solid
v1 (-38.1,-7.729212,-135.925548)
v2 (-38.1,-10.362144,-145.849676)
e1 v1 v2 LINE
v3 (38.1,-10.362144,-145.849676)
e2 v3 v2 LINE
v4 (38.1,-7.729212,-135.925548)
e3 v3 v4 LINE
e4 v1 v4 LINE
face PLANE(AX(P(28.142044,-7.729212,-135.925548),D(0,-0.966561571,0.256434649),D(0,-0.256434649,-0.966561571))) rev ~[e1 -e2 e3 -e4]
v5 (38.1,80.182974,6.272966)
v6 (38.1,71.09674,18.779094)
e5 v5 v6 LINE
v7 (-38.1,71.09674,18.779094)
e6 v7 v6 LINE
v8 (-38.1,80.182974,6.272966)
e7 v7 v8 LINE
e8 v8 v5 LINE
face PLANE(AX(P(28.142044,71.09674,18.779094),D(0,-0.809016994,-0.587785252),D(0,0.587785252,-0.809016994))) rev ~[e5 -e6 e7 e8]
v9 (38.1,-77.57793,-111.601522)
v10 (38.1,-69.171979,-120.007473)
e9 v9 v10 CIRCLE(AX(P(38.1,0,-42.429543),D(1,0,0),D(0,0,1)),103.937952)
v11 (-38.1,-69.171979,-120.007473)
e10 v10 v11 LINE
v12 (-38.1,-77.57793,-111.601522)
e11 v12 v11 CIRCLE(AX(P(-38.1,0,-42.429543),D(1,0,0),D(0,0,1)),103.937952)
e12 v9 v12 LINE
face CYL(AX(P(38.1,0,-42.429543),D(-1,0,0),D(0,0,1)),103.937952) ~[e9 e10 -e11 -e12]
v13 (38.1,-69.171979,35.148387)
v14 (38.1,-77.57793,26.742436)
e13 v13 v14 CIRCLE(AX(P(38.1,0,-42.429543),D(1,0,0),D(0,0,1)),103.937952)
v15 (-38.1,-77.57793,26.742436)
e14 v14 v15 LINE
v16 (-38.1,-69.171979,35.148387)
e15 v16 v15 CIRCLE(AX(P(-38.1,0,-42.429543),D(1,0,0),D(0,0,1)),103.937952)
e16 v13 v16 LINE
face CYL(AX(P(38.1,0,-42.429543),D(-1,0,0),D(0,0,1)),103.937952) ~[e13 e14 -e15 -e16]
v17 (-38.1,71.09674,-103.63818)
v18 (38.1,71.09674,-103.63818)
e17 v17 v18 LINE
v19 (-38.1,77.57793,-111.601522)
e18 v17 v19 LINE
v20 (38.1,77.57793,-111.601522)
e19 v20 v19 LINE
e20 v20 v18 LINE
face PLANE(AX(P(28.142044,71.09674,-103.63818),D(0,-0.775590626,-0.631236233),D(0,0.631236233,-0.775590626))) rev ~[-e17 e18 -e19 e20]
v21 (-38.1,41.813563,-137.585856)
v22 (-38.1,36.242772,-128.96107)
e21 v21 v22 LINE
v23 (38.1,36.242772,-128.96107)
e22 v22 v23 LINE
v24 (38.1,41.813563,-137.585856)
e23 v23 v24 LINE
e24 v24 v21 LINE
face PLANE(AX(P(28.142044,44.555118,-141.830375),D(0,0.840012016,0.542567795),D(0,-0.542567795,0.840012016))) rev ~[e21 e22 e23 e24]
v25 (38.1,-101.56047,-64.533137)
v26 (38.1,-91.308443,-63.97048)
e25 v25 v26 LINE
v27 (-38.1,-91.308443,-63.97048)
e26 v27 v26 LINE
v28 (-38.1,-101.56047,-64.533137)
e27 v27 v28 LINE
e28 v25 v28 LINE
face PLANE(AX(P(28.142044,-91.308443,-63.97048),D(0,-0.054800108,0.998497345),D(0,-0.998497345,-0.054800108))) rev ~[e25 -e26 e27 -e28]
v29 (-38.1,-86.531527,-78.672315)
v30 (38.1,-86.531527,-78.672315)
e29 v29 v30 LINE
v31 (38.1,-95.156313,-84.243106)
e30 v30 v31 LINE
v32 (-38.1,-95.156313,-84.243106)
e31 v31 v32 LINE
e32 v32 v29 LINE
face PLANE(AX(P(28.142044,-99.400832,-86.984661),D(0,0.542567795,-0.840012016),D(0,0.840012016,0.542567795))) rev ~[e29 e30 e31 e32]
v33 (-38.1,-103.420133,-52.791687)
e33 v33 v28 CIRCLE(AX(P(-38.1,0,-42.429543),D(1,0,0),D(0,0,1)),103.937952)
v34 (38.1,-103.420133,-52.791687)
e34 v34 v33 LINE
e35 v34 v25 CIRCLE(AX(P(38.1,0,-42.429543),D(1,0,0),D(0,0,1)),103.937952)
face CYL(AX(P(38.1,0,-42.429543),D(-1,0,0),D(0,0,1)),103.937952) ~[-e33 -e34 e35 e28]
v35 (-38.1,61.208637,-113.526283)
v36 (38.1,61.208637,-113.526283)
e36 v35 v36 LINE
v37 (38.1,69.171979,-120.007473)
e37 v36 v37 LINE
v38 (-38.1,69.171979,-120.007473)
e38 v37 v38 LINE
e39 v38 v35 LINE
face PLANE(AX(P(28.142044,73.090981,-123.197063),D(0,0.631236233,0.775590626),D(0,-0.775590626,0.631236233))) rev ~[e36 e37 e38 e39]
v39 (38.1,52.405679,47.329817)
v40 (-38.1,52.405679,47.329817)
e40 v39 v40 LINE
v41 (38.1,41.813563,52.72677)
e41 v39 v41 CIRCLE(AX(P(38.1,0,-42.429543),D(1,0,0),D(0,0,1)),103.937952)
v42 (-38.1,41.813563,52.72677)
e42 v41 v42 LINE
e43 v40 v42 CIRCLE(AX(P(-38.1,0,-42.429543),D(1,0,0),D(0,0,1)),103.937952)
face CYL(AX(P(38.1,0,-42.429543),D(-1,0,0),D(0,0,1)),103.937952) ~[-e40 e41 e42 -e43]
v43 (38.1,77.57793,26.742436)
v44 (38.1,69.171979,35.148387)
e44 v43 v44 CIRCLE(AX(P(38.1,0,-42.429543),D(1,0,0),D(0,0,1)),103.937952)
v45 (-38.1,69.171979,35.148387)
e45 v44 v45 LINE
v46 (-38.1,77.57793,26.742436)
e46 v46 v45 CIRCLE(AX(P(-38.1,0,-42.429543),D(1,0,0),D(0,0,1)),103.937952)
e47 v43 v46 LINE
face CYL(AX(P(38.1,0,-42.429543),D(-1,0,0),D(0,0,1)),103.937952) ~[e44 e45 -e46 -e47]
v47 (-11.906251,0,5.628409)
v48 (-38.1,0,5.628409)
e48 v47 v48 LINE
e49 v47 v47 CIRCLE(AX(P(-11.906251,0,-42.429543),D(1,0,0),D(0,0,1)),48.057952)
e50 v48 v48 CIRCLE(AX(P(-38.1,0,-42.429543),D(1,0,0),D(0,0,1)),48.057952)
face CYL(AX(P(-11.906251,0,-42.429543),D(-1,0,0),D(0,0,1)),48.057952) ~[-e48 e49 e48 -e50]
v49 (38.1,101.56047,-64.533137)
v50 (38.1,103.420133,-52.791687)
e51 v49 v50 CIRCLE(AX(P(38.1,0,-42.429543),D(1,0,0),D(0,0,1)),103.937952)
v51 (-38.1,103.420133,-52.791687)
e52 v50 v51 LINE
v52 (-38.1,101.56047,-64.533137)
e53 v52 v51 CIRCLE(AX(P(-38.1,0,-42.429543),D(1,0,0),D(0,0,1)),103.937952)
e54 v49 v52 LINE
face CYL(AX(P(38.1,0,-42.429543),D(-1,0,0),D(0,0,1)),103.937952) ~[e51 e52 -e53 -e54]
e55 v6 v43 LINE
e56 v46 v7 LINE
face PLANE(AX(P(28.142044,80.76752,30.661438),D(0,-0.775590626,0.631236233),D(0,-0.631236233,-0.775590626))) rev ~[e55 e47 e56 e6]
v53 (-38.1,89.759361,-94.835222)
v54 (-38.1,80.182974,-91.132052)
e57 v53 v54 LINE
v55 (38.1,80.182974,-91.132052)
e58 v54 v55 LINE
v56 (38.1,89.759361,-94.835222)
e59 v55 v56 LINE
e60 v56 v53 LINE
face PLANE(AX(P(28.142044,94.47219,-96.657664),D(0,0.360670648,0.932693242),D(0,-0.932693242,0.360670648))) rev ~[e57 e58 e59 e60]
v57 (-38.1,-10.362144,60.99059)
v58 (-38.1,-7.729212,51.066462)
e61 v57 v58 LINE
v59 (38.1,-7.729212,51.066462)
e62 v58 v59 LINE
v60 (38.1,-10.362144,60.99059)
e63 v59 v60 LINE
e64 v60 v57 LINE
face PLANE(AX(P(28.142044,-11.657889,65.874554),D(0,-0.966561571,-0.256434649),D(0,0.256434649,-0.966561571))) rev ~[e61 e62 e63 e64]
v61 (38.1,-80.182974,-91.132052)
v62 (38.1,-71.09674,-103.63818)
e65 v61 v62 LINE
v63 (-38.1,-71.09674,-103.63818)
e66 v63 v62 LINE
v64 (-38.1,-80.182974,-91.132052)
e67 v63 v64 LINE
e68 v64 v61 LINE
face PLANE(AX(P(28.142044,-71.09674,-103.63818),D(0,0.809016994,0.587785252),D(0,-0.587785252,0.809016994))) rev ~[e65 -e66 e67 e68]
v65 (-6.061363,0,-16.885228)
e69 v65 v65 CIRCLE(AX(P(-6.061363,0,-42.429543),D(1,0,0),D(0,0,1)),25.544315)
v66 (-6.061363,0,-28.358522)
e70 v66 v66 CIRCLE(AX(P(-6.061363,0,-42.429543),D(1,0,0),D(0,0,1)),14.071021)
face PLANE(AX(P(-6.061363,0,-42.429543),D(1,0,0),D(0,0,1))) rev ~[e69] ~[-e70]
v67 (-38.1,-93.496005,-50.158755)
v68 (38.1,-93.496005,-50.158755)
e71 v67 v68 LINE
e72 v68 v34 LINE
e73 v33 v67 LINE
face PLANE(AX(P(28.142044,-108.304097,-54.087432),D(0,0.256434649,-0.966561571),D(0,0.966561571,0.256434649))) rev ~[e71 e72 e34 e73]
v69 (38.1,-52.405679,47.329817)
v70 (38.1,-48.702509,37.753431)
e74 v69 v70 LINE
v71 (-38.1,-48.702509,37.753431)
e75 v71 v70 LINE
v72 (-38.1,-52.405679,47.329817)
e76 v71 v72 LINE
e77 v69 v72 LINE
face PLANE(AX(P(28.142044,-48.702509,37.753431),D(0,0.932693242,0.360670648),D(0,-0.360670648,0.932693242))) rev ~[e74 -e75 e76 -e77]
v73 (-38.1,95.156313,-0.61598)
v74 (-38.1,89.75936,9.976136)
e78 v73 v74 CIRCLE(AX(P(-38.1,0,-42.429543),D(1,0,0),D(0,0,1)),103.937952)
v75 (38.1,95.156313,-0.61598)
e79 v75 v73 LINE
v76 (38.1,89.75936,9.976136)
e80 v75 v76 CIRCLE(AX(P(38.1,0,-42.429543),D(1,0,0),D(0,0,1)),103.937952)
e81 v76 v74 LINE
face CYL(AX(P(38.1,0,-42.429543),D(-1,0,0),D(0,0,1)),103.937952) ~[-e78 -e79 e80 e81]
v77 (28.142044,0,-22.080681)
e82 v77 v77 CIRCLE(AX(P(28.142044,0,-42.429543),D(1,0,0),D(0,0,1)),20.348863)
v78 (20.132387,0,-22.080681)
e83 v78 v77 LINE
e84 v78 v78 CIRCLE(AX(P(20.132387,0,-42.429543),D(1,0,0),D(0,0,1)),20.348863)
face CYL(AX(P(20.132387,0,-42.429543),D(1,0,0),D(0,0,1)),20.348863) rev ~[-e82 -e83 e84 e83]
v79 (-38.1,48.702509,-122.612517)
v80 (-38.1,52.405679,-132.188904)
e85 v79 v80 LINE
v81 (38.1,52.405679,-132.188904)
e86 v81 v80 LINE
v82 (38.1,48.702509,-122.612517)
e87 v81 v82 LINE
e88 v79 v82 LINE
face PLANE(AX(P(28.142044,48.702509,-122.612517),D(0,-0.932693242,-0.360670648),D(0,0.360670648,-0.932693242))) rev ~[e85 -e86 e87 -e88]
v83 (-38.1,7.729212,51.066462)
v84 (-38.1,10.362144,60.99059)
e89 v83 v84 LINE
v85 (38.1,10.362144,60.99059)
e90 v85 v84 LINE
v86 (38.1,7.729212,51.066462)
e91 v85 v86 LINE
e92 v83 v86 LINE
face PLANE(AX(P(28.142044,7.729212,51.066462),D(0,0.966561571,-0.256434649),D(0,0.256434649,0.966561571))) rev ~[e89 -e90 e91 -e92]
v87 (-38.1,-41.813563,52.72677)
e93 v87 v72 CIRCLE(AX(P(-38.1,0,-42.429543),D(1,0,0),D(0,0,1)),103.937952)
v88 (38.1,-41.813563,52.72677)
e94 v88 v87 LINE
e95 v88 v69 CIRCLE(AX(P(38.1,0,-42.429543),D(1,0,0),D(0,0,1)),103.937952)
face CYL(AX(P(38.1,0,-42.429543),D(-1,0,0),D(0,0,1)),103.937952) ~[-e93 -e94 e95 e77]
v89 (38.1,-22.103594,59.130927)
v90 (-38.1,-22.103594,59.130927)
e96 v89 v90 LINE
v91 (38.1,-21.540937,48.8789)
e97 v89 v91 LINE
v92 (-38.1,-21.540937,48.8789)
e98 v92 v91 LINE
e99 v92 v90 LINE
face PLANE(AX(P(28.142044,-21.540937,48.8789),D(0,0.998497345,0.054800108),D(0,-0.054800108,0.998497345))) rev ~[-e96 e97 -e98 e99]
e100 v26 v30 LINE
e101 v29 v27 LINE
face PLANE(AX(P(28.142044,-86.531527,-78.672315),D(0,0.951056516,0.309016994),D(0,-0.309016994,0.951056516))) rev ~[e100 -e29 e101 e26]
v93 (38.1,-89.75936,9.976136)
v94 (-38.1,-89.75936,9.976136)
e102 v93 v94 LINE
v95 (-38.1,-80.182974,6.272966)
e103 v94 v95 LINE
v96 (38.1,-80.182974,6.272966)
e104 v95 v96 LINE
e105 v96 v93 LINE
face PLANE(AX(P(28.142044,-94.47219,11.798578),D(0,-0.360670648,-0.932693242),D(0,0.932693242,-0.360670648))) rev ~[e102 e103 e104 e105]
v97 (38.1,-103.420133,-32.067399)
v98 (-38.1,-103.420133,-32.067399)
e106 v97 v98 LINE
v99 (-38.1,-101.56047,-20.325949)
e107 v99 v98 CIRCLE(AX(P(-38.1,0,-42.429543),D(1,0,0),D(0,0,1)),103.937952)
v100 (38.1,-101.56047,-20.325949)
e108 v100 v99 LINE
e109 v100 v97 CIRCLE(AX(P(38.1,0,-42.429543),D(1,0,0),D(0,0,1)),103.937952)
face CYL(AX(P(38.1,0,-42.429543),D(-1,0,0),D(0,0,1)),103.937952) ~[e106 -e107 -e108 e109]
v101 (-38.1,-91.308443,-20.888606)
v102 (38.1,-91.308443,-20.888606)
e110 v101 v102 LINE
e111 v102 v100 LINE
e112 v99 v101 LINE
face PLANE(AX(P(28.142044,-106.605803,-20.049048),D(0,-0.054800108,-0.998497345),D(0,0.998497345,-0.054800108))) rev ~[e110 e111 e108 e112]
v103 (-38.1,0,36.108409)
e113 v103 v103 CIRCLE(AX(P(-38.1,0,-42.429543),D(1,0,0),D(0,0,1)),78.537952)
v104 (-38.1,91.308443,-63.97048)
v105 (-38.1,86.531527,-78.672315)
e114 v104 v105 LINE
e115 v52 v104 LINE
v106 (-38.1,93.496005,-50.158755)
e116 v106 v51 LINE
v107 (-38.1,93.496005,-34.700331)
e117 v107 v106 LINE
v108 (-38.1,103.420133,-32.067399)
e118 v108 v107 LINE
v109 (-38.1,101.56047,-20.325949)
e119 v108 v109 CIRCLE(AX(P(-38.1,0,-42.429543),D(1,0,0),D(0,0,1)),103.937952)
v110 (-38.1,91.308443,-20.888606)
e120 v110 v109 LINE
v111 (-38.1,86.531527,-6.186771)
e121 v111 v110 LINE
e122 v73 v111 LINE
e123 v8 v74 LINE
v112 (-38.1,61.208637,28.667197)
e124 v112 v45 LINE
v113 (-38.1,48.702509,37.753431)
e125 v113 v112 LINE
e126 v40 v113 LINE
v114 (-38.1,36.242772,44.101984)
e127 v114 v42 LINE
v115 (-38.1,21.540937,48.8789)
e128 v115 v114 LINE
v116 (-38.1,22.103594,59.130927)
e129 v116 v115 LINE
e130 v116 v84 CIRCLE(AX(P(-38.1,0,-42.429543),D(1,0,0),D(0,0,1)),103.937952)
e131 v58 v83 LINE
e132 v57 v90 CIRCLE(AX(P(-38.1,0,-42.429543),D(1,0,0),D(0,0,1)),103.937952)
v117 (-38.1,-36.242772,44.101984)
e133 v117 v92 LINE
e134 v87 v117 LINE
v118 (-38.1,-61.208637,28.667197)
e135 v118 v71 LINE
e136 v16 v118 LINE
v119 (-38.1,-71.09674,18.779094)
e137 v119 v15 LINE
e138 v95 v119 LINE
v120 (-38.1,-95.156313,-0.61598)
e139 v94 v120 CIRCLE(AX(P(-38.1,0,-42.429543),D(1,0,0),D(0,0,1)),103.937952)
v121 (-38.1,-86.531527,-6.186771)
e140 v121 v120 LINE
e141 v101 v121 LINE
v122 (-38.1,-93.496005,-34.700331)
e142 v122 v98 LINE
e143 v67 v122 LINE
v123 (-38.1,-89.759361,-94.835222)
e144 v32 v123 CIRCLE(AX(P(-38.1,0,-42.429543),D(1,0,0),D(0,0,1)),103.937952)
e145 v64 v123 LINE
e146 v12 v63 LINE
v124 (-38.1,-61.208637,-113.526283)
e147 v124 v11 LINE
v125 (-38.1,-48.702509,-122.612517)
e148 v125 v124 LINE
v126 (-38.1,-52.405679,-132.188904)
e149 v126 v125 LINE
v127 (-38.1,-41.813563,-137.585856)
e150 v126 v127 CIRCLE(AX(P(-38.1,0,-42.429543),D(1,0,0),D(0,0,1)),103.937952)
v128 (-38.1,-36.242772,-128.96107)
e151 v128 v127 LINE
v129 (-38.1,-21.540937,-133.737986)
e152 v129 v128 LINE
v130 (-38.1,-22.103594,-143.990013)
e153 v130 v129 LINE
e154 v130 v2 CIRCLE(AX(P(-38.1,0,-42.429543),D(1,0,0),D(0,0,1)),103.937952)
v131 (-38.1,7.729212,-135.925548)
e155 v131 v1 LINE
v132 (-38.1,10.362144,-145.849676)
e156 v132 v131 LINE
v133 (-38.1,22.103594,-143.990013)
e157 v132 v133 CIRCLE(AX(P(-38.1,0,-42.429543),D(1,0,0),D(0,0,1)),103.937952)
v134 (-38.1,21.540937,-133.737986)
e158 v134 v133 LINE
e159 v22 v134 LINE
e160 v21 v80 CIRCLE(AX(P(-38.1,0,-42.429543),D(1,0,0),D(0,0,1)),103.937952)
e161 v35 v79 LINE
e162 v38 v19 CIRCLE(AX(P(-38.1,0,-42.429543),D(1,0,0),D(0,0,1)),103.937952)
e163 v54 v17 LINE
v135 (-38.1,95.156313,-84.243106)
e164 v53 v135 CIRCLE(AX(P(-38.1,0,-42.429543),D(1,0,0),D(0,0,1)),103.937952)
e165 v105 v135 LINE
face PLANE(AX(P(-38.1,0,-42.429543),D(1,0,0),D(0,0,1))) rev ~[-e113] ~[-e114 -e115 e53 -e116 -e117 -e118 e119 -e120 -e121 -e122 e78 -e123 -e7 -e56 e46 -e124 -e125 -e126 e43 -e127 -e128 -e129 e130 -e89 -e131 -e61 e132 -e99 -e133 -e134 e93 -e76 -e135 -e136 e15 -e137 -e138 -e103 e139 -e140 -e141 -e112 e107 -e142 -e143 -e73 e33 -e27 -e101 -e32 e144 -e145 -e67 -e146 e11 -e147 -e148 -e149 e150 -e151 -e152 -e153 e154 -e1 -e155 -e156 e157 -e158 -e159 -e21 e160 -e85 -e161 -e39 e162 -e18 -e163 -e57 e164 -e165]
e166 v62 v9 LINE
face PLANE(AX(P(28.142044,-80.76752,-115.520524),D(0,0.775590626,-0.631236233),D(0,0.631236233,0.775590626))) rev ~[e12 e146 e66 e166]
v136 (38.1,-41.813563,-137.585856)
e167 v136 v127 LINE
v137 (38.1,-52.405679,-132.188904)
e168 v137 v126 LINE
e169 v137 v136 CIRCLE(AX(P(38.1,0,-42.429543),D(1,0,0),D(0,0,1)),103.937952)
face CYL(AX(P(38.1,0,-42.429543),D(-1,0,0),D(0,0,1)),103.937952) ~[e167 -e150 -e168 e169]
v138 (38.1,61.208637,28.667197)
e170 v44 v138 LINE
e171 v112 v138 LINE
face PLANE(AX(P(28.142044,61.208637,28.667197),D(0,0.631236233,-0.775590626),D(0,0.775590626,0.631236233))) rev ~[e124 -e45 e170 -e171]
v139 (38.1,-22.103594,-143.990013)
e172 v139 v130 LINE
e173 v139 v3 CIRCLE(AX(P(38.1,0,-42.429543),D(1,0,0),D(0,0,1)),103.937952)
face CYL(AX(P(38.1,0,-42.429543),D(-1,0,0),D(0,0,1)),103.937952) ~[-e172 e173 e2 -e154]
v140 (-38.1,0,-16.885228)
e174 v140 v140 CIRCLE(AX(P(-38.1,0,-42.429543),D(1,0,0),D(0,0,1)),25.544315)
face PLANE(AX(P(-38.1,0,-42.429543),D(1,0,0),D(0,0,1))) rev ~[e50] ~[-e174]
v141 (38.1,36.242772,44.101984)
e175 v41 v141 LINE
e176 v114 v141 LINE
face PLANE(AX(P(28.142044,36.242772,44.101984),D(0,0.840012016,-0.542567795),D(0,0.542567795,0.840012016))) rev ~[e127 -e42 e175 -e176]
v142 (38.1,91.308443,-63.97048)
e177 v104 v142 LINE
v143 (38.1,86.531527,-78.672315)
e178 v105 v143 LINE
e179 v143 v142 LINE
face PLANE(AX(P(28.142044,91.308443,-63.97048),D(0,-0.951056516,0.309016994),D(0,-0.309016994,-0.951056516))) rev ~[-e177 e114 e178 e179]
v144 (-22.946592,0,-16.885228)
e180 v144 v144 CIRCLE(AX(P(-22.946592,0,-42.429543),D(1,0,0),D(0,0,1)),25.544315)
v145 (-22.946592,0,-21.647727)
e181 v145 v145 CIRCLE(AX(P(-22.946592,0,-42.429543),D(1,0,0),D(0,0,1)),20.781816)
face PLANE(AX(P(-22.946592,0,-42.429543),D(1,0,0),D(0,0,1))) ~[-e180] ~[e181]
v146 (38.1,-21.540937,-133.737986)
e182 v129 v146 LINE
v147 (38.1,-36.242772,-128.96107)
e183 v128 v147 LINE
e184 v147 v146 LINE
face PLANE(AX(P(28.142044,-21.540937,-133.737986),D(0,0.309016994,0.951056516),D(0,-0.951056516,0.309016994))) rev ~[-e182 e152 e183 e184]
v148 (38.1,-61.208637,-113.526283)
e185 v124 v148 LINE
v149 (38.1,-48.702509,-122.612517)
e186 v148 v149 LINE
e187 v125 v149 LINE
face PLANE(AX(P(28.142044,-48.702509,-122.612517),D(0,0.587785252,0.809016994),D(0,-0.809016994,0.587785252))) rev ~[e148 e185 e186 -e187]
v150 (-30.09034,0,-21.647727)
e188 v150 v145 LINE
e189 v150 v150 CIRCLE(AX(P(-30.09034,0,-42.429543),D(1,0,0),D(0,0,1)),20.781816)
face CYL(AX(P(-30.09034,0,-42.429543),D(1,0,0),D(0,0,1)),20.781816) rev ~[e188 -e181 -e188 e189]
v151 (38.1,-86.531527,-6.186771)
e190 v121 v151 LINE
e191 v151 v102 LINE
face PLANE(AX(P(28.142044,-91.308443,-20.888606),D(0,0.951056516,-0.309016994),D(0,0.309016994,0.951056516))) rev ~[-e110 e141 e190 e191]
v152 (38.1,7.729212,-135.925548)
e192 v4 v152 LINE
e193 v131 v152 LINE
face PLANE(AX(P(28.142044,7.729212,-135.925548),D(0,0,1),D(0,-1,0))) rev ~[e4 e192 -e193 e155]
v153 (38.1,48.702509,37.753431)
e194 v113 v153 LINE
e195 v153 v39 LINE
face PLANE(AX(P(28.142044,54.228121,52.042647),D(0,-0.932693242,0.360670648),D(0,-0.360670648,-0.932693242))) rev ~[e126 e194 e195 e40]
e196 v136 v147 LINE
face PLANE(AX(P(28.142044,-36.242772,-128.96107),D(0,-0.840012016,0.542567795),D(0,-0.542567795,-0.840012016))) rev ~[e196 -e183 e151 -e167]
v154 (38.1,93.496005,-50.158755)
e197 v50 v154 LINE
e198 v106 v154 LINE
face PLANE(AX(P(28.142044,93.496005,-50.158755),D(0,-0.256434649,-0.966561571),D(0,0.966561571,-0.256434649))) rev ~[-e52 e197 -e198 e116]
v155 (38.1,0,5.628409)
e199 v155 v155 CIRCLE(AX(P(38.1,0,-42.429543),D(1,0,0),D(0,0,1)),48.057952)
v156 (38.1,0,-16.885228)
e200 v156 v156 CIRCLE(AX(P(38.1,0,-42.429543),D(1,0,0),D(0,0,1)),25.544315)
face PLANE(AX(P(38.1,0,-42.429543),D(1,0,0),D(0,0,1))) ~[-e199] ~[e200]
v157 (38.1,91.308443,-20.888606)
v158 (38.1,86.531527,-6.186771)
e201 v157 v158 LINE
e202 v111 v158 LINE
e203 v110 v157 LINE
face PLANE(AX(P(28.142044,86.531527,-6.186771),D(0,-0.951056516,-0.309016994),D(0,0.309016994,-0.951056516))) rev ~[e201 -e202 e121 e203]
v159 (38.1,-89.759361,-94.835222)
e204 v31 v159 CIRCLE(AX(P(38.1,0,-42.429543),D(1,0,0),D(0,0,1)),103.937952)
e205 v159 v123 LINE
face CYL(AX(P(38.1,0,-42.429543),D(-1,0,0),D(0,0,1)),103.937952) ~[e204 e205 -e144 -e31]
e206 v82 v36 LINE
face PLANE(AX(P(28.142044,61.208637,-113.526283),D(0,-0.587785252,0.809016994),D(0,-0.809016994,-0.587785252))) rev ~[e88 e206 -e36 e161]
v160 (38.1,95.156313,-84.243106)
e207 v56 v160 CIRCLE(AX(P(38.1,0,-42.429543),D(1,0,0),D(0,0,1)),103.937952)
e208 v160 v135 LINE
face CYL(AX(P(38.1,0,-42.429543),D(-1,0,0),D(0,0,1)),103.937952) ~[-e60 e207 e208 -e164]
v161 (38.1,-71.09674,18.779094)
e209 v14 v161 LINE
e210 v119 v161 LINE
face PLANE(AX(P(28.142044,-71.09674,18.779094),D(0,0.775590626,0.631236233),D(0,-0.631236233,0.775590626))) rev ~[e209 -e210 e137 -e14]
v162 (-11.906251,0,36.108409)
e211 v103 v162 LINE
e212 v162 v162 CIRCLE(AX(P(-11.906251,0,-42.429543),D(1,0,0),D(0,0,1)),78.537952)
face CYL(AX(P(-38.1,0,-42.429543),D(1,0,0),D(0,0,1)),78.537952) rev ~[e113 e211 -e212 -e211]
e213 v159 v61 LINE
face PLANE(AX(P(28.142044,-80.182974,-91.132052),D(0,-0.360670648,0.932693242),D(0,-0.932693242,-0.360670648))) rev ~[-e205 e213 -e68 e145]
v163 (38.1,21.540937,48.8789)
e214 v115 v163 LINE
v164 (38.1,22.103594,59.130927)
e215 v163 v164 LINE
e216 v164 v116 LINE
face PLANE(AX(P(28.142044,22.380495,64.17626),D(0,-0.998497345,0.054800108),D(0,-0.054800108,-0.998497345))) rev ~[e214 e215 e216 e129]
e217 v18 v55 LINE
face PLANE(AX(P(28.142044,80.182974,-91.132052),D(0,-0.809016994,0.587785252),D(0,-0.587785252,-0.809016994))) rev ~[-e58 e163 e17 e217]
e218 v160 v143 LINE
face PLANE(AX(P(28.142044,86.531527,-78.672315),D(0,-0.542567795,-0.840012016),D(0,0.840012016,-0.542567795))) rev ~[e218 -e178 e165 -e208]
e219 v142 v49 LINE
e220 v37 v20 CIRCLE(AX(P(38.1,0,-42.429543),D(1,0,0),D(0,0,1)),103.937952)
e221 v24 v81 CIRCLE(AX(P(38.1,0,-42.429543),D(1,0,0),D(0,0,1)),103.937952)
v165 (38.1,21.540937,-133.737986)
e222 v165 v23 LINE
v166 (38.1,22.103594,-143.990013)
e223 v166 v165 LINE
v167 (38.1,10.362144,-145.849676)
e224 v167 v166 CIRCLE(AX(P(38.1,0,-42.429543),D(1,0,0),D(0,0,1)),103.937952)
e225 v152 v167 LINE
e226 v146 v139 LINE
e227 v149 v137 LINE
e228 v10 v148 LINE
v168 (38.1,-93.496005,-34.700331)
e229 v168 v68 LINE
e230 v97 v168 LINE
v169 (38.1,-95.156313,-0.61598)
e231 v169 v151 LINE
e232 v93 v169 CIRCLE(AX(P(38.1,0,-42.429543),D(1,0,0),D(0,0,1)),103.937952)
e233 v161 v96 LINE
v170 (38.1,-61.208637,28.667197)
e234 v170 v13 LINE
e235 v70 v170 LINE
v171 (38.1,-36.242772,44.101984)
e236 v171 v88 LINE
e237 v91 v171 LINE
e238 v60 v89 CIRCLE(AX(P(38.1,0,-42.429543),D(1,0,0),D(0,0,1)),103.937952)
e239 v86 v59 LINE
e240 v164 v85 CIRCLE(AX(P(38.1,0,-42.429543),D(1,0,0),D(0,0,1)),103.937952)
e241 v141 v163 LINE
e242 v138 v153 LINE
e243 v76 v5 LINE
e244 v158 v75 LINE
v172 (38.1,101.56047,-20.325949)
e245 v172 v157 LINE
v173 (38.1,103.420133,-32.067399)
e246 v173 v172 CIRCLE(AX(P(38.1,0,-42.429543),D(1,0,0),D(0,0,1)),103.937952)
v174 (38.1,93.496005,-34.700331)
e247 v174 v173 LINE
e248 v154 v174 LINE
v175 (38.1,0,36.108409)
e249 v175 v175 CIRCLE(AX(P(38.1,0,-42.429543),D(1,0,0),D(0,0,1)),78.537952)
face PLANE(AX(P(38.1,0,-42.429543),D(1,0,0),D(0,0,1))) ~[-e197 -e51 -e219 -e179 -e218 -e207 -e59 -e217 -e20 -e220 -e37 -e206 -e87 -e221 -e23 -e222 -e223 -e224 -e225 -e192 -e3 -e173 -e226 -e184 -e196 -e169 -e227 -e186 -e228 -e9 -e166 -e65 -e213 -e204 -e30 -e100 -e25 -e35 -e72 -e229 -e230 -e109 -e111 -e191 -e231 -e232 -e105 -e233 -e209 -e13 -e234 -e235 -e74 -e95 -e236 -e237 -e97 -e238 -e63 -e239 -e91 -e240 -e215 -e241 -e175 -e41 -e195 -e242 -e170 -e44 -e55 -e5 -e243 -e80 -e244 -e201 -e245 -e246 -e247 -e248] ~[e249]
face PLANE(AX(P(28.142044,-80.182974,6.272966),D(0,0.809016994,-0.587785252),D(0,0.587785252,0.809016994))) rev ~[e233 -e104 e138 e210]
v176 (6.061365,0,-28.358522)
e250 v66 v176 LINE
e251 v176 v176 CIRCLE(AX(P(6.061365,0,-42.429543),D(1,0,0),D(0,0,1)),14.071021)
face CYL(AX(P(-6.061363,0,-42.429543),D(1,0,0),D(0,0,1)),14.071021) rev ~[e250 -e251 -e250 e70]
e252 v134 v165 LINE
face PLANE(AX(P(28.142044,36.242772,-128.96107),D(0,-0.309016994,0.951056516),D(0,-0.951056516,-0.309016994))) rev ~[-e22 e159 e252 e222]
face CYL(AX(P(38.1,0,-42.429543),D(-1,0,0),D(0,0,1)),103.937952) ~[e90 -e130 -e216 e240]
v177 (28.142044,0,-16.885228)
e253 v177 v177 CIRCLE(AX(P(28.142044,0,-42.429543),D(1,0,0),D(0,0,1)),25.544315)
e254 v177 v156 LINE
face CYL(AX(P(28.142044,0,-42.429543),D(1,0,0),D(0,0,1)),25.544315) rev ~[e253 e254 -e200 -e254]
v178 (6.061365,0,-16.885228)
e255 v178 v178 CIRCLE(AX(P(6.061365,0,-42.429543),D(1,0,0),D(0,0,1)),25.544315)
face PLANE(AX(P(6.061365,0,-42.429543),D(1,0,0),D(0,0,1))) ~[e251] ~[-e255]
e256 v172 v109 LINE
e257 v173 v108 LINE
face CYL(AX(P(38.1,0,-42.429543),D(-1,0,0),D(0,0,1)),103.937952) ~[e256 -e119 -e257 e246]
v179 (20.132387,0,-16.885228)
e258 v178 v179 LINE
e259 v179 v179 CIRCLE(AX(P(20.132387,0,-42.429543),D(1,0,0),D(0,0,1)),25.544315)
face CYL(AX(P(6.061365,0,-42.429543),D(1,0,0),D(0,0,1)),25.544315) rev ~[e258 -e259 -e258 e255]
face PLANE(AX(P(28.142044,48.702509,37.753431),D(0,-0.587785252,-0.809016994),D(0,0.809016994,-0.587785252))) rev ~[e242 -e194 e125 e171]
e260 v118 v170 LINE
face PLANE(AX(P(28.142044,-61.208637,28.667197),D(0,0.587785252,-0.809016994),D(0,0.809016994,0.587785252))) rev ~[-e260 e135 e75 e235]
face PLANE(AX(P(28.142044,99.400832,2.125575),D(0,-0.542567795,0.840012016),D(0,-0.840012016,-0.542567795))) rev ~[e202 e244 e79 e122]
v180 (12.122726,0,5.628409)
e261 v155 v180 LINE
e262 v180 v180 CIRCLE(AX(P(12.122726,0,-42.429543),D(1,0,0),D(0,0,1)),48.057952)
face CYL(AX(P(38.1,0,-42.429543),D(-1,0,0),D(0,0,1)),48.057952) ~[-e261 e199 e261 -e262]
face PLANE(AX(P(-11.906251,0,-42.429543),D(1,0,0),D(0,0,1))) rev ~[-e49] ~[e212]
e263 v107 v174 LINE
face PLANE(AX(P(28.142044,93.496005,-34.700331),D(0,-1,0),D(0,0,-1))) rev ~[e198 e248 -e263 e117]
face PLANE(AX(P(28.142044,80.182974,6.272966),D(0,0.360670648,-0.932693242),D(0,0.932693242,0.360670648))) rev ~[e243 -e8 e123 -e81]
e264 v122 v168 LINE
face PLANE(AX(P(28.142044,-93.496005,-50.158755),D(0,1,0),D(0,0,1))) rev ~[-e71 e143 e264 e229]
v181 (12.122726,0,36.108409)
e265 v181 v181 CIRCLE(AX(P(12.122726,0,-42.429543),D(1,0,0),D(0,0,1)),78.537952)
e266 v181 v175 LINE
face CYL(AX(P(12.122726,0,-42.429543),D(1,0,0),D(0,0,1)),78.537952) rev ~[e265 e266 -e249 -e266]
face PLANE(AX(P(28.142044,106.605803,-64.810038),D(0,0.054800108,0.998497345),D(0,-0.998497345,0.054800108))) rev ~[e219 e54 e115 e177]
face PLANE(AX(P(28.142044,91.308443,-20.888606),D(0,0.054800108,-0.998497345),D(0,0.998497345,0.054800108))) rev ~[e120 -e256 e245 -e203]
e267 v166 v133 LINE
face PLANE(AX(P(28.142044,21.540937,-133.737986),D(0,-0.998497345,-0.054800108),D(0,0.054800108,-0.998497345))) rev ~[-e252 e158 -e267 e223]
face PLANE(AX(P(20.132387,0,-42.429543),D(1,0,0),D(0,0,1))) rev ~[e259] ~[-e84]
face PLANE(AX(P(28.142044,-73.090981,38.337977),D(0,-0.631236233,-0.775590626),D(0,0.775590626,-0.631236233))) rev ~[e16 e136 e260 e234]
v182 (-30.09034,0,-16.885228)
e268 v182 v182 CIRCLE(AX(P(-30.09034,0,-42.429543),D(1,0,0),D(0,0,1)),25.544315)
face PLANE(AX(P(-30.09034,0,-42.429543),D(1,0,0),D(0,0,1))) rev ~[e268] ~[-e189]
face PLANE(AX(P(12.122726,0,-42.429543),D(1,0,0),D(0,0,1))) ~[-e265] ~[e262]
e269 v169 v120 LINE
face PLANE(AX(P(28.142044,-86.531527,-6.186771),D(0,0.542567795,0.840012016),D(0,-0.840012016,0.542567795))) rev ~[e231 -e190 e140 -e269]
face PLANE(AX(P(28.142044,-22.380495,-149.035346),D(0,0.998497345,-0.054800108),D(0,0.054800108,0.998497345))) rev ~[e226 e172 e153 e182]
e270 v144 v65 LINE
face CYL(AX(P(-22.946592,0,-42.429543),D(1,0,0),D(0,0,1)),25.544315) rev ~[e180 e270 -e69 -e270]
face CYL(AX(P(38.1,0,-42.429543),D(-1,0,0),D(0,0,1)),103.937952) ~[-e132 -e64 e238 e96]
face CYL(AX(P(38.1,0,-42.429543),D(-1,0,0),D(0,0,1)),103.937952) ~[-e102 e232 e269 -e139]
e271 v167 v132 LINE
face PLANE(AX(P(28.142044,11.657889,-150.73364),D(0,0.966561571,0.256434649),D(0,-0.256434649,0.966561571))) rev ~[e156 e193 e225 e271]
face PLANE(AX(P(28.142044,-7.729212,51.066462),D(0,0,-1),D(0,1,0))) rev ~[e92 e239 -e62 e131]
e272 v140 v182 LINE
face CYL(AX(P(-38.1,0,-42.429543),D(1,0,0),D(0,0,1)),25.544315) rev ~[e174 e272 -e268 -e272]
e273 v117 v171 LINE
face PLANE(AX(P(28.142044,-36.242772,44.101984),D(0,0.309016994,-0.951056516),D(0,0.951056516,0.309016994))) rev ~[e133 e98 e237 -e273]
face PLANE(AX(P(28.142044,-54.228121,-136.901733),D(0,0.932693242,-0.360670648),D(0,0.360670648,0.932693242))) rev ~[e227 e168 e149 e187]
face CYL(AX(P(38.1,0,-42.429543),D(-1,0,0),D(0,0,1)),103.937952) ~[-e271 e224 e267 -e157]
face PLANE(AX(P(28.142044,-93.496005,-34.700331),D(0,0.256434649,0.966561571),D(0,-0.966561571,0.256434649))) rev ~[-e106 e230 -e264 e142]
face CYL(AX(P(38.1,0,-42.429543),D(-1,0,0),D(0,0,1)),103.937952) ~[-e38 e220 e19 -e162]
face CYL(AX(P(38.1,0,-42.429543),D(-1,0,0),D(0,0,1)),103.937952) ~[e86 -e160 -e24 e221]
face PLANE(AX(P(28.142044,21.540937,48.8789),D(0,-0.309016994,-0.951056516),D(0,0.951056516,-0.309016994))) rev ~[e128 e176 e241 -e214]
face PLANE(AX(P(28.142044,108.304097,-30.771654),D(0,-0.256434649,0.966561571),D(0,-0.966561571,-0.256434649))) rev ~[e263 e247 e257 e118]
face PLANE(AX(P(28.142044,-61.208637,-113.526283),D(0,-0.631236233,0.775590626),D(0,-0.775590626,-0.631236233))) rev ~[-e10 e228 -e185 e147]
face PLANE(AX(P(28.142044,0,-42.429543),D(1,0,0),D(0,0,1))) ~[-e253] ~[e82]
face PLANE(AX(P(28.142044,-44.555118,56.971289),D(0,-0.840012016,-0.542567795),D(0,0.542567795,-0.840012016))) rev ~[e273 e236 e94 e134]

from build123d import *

# Parameters (mm, degrees)
F3_DEPTH        = 88.646
F3_COPIES_COUNT = 20


# Not quite as in the source:
# - a feature of the source that left no trace in its solid (it failed there, or was rolled back) is left out
# - a pattern or mirror of a feature is missing from the dataset's text; its kind, count and spacing are read off the source's solid


with BuildPart() as f1:
    # F0 (on Front) → F1 (revolve)
    with BuildSketch(Plane.XZ):
        Polygon((38.1, 36.1084090909), (38.1, 61.5084090909), (-38.1, 61.5084090909), (-38.1, 36.1084090909), (-11.9062505468, 36.1084090909), (-11.9062505468, 5.6284090909), (-38.1, 5.6284090909), (-38.1, -16.8852278195), (-30.0903403623, -16.8852278195), (-30.0903403623, -21.6477272727), (-22.9465920027, -21.6477272727), (-22.9465920027, -16.8852278195), (-6.0613630896, -16.8852278195), (-6.0613630896, -28.3585221805), (6.0613652768, -28.3585221805), (6.0613652768, -16.8852278195), (20.1323869104, -16.8852278195), (20.1323869104, -22.0806807246), (28.1420443609, -22.0806807246), (28.1420443609, -16.8852278195), (38.1, -16.8852278195), (38.1, 5.6284090909), (12.1227261791, 5.6284090909), (12.1227261791, 36.1084090909), align=None)
    revolve(axis=Axis((0.8659090909, 0, -42.4295432673), (1, 0, 0)))

    # F2 (on face) → F3 (cut, symmetric)
    with BuildSketch(Plane.YZ.offset(28.1420443609)):
        Polygon((0, 65.8745542169), (-11.6578890011, 65.8745542169), (-7.7292122878, 51.0664619505), (0, 51.0664619505), (7.7292122878, 51.0664619505), (11.6578890011, 65.8745542169), align=None)
    f3 = extrude(amount=F3_DEPTH, both=True, mode=Mode.SUBTRACT)

    # F3_copies: F3 ×20 about axis
    f3_copies_axis = Axis((0, 0, -42.429543), (1, 0, 0))
    for i in range(1, F3_COPIES_COUNT):
        add(f3.rotate(f3_copies_axis, i * 360 / F3_COPIES_COUNT), mode=Mode.SUBTRACT)


solid = f1.part
